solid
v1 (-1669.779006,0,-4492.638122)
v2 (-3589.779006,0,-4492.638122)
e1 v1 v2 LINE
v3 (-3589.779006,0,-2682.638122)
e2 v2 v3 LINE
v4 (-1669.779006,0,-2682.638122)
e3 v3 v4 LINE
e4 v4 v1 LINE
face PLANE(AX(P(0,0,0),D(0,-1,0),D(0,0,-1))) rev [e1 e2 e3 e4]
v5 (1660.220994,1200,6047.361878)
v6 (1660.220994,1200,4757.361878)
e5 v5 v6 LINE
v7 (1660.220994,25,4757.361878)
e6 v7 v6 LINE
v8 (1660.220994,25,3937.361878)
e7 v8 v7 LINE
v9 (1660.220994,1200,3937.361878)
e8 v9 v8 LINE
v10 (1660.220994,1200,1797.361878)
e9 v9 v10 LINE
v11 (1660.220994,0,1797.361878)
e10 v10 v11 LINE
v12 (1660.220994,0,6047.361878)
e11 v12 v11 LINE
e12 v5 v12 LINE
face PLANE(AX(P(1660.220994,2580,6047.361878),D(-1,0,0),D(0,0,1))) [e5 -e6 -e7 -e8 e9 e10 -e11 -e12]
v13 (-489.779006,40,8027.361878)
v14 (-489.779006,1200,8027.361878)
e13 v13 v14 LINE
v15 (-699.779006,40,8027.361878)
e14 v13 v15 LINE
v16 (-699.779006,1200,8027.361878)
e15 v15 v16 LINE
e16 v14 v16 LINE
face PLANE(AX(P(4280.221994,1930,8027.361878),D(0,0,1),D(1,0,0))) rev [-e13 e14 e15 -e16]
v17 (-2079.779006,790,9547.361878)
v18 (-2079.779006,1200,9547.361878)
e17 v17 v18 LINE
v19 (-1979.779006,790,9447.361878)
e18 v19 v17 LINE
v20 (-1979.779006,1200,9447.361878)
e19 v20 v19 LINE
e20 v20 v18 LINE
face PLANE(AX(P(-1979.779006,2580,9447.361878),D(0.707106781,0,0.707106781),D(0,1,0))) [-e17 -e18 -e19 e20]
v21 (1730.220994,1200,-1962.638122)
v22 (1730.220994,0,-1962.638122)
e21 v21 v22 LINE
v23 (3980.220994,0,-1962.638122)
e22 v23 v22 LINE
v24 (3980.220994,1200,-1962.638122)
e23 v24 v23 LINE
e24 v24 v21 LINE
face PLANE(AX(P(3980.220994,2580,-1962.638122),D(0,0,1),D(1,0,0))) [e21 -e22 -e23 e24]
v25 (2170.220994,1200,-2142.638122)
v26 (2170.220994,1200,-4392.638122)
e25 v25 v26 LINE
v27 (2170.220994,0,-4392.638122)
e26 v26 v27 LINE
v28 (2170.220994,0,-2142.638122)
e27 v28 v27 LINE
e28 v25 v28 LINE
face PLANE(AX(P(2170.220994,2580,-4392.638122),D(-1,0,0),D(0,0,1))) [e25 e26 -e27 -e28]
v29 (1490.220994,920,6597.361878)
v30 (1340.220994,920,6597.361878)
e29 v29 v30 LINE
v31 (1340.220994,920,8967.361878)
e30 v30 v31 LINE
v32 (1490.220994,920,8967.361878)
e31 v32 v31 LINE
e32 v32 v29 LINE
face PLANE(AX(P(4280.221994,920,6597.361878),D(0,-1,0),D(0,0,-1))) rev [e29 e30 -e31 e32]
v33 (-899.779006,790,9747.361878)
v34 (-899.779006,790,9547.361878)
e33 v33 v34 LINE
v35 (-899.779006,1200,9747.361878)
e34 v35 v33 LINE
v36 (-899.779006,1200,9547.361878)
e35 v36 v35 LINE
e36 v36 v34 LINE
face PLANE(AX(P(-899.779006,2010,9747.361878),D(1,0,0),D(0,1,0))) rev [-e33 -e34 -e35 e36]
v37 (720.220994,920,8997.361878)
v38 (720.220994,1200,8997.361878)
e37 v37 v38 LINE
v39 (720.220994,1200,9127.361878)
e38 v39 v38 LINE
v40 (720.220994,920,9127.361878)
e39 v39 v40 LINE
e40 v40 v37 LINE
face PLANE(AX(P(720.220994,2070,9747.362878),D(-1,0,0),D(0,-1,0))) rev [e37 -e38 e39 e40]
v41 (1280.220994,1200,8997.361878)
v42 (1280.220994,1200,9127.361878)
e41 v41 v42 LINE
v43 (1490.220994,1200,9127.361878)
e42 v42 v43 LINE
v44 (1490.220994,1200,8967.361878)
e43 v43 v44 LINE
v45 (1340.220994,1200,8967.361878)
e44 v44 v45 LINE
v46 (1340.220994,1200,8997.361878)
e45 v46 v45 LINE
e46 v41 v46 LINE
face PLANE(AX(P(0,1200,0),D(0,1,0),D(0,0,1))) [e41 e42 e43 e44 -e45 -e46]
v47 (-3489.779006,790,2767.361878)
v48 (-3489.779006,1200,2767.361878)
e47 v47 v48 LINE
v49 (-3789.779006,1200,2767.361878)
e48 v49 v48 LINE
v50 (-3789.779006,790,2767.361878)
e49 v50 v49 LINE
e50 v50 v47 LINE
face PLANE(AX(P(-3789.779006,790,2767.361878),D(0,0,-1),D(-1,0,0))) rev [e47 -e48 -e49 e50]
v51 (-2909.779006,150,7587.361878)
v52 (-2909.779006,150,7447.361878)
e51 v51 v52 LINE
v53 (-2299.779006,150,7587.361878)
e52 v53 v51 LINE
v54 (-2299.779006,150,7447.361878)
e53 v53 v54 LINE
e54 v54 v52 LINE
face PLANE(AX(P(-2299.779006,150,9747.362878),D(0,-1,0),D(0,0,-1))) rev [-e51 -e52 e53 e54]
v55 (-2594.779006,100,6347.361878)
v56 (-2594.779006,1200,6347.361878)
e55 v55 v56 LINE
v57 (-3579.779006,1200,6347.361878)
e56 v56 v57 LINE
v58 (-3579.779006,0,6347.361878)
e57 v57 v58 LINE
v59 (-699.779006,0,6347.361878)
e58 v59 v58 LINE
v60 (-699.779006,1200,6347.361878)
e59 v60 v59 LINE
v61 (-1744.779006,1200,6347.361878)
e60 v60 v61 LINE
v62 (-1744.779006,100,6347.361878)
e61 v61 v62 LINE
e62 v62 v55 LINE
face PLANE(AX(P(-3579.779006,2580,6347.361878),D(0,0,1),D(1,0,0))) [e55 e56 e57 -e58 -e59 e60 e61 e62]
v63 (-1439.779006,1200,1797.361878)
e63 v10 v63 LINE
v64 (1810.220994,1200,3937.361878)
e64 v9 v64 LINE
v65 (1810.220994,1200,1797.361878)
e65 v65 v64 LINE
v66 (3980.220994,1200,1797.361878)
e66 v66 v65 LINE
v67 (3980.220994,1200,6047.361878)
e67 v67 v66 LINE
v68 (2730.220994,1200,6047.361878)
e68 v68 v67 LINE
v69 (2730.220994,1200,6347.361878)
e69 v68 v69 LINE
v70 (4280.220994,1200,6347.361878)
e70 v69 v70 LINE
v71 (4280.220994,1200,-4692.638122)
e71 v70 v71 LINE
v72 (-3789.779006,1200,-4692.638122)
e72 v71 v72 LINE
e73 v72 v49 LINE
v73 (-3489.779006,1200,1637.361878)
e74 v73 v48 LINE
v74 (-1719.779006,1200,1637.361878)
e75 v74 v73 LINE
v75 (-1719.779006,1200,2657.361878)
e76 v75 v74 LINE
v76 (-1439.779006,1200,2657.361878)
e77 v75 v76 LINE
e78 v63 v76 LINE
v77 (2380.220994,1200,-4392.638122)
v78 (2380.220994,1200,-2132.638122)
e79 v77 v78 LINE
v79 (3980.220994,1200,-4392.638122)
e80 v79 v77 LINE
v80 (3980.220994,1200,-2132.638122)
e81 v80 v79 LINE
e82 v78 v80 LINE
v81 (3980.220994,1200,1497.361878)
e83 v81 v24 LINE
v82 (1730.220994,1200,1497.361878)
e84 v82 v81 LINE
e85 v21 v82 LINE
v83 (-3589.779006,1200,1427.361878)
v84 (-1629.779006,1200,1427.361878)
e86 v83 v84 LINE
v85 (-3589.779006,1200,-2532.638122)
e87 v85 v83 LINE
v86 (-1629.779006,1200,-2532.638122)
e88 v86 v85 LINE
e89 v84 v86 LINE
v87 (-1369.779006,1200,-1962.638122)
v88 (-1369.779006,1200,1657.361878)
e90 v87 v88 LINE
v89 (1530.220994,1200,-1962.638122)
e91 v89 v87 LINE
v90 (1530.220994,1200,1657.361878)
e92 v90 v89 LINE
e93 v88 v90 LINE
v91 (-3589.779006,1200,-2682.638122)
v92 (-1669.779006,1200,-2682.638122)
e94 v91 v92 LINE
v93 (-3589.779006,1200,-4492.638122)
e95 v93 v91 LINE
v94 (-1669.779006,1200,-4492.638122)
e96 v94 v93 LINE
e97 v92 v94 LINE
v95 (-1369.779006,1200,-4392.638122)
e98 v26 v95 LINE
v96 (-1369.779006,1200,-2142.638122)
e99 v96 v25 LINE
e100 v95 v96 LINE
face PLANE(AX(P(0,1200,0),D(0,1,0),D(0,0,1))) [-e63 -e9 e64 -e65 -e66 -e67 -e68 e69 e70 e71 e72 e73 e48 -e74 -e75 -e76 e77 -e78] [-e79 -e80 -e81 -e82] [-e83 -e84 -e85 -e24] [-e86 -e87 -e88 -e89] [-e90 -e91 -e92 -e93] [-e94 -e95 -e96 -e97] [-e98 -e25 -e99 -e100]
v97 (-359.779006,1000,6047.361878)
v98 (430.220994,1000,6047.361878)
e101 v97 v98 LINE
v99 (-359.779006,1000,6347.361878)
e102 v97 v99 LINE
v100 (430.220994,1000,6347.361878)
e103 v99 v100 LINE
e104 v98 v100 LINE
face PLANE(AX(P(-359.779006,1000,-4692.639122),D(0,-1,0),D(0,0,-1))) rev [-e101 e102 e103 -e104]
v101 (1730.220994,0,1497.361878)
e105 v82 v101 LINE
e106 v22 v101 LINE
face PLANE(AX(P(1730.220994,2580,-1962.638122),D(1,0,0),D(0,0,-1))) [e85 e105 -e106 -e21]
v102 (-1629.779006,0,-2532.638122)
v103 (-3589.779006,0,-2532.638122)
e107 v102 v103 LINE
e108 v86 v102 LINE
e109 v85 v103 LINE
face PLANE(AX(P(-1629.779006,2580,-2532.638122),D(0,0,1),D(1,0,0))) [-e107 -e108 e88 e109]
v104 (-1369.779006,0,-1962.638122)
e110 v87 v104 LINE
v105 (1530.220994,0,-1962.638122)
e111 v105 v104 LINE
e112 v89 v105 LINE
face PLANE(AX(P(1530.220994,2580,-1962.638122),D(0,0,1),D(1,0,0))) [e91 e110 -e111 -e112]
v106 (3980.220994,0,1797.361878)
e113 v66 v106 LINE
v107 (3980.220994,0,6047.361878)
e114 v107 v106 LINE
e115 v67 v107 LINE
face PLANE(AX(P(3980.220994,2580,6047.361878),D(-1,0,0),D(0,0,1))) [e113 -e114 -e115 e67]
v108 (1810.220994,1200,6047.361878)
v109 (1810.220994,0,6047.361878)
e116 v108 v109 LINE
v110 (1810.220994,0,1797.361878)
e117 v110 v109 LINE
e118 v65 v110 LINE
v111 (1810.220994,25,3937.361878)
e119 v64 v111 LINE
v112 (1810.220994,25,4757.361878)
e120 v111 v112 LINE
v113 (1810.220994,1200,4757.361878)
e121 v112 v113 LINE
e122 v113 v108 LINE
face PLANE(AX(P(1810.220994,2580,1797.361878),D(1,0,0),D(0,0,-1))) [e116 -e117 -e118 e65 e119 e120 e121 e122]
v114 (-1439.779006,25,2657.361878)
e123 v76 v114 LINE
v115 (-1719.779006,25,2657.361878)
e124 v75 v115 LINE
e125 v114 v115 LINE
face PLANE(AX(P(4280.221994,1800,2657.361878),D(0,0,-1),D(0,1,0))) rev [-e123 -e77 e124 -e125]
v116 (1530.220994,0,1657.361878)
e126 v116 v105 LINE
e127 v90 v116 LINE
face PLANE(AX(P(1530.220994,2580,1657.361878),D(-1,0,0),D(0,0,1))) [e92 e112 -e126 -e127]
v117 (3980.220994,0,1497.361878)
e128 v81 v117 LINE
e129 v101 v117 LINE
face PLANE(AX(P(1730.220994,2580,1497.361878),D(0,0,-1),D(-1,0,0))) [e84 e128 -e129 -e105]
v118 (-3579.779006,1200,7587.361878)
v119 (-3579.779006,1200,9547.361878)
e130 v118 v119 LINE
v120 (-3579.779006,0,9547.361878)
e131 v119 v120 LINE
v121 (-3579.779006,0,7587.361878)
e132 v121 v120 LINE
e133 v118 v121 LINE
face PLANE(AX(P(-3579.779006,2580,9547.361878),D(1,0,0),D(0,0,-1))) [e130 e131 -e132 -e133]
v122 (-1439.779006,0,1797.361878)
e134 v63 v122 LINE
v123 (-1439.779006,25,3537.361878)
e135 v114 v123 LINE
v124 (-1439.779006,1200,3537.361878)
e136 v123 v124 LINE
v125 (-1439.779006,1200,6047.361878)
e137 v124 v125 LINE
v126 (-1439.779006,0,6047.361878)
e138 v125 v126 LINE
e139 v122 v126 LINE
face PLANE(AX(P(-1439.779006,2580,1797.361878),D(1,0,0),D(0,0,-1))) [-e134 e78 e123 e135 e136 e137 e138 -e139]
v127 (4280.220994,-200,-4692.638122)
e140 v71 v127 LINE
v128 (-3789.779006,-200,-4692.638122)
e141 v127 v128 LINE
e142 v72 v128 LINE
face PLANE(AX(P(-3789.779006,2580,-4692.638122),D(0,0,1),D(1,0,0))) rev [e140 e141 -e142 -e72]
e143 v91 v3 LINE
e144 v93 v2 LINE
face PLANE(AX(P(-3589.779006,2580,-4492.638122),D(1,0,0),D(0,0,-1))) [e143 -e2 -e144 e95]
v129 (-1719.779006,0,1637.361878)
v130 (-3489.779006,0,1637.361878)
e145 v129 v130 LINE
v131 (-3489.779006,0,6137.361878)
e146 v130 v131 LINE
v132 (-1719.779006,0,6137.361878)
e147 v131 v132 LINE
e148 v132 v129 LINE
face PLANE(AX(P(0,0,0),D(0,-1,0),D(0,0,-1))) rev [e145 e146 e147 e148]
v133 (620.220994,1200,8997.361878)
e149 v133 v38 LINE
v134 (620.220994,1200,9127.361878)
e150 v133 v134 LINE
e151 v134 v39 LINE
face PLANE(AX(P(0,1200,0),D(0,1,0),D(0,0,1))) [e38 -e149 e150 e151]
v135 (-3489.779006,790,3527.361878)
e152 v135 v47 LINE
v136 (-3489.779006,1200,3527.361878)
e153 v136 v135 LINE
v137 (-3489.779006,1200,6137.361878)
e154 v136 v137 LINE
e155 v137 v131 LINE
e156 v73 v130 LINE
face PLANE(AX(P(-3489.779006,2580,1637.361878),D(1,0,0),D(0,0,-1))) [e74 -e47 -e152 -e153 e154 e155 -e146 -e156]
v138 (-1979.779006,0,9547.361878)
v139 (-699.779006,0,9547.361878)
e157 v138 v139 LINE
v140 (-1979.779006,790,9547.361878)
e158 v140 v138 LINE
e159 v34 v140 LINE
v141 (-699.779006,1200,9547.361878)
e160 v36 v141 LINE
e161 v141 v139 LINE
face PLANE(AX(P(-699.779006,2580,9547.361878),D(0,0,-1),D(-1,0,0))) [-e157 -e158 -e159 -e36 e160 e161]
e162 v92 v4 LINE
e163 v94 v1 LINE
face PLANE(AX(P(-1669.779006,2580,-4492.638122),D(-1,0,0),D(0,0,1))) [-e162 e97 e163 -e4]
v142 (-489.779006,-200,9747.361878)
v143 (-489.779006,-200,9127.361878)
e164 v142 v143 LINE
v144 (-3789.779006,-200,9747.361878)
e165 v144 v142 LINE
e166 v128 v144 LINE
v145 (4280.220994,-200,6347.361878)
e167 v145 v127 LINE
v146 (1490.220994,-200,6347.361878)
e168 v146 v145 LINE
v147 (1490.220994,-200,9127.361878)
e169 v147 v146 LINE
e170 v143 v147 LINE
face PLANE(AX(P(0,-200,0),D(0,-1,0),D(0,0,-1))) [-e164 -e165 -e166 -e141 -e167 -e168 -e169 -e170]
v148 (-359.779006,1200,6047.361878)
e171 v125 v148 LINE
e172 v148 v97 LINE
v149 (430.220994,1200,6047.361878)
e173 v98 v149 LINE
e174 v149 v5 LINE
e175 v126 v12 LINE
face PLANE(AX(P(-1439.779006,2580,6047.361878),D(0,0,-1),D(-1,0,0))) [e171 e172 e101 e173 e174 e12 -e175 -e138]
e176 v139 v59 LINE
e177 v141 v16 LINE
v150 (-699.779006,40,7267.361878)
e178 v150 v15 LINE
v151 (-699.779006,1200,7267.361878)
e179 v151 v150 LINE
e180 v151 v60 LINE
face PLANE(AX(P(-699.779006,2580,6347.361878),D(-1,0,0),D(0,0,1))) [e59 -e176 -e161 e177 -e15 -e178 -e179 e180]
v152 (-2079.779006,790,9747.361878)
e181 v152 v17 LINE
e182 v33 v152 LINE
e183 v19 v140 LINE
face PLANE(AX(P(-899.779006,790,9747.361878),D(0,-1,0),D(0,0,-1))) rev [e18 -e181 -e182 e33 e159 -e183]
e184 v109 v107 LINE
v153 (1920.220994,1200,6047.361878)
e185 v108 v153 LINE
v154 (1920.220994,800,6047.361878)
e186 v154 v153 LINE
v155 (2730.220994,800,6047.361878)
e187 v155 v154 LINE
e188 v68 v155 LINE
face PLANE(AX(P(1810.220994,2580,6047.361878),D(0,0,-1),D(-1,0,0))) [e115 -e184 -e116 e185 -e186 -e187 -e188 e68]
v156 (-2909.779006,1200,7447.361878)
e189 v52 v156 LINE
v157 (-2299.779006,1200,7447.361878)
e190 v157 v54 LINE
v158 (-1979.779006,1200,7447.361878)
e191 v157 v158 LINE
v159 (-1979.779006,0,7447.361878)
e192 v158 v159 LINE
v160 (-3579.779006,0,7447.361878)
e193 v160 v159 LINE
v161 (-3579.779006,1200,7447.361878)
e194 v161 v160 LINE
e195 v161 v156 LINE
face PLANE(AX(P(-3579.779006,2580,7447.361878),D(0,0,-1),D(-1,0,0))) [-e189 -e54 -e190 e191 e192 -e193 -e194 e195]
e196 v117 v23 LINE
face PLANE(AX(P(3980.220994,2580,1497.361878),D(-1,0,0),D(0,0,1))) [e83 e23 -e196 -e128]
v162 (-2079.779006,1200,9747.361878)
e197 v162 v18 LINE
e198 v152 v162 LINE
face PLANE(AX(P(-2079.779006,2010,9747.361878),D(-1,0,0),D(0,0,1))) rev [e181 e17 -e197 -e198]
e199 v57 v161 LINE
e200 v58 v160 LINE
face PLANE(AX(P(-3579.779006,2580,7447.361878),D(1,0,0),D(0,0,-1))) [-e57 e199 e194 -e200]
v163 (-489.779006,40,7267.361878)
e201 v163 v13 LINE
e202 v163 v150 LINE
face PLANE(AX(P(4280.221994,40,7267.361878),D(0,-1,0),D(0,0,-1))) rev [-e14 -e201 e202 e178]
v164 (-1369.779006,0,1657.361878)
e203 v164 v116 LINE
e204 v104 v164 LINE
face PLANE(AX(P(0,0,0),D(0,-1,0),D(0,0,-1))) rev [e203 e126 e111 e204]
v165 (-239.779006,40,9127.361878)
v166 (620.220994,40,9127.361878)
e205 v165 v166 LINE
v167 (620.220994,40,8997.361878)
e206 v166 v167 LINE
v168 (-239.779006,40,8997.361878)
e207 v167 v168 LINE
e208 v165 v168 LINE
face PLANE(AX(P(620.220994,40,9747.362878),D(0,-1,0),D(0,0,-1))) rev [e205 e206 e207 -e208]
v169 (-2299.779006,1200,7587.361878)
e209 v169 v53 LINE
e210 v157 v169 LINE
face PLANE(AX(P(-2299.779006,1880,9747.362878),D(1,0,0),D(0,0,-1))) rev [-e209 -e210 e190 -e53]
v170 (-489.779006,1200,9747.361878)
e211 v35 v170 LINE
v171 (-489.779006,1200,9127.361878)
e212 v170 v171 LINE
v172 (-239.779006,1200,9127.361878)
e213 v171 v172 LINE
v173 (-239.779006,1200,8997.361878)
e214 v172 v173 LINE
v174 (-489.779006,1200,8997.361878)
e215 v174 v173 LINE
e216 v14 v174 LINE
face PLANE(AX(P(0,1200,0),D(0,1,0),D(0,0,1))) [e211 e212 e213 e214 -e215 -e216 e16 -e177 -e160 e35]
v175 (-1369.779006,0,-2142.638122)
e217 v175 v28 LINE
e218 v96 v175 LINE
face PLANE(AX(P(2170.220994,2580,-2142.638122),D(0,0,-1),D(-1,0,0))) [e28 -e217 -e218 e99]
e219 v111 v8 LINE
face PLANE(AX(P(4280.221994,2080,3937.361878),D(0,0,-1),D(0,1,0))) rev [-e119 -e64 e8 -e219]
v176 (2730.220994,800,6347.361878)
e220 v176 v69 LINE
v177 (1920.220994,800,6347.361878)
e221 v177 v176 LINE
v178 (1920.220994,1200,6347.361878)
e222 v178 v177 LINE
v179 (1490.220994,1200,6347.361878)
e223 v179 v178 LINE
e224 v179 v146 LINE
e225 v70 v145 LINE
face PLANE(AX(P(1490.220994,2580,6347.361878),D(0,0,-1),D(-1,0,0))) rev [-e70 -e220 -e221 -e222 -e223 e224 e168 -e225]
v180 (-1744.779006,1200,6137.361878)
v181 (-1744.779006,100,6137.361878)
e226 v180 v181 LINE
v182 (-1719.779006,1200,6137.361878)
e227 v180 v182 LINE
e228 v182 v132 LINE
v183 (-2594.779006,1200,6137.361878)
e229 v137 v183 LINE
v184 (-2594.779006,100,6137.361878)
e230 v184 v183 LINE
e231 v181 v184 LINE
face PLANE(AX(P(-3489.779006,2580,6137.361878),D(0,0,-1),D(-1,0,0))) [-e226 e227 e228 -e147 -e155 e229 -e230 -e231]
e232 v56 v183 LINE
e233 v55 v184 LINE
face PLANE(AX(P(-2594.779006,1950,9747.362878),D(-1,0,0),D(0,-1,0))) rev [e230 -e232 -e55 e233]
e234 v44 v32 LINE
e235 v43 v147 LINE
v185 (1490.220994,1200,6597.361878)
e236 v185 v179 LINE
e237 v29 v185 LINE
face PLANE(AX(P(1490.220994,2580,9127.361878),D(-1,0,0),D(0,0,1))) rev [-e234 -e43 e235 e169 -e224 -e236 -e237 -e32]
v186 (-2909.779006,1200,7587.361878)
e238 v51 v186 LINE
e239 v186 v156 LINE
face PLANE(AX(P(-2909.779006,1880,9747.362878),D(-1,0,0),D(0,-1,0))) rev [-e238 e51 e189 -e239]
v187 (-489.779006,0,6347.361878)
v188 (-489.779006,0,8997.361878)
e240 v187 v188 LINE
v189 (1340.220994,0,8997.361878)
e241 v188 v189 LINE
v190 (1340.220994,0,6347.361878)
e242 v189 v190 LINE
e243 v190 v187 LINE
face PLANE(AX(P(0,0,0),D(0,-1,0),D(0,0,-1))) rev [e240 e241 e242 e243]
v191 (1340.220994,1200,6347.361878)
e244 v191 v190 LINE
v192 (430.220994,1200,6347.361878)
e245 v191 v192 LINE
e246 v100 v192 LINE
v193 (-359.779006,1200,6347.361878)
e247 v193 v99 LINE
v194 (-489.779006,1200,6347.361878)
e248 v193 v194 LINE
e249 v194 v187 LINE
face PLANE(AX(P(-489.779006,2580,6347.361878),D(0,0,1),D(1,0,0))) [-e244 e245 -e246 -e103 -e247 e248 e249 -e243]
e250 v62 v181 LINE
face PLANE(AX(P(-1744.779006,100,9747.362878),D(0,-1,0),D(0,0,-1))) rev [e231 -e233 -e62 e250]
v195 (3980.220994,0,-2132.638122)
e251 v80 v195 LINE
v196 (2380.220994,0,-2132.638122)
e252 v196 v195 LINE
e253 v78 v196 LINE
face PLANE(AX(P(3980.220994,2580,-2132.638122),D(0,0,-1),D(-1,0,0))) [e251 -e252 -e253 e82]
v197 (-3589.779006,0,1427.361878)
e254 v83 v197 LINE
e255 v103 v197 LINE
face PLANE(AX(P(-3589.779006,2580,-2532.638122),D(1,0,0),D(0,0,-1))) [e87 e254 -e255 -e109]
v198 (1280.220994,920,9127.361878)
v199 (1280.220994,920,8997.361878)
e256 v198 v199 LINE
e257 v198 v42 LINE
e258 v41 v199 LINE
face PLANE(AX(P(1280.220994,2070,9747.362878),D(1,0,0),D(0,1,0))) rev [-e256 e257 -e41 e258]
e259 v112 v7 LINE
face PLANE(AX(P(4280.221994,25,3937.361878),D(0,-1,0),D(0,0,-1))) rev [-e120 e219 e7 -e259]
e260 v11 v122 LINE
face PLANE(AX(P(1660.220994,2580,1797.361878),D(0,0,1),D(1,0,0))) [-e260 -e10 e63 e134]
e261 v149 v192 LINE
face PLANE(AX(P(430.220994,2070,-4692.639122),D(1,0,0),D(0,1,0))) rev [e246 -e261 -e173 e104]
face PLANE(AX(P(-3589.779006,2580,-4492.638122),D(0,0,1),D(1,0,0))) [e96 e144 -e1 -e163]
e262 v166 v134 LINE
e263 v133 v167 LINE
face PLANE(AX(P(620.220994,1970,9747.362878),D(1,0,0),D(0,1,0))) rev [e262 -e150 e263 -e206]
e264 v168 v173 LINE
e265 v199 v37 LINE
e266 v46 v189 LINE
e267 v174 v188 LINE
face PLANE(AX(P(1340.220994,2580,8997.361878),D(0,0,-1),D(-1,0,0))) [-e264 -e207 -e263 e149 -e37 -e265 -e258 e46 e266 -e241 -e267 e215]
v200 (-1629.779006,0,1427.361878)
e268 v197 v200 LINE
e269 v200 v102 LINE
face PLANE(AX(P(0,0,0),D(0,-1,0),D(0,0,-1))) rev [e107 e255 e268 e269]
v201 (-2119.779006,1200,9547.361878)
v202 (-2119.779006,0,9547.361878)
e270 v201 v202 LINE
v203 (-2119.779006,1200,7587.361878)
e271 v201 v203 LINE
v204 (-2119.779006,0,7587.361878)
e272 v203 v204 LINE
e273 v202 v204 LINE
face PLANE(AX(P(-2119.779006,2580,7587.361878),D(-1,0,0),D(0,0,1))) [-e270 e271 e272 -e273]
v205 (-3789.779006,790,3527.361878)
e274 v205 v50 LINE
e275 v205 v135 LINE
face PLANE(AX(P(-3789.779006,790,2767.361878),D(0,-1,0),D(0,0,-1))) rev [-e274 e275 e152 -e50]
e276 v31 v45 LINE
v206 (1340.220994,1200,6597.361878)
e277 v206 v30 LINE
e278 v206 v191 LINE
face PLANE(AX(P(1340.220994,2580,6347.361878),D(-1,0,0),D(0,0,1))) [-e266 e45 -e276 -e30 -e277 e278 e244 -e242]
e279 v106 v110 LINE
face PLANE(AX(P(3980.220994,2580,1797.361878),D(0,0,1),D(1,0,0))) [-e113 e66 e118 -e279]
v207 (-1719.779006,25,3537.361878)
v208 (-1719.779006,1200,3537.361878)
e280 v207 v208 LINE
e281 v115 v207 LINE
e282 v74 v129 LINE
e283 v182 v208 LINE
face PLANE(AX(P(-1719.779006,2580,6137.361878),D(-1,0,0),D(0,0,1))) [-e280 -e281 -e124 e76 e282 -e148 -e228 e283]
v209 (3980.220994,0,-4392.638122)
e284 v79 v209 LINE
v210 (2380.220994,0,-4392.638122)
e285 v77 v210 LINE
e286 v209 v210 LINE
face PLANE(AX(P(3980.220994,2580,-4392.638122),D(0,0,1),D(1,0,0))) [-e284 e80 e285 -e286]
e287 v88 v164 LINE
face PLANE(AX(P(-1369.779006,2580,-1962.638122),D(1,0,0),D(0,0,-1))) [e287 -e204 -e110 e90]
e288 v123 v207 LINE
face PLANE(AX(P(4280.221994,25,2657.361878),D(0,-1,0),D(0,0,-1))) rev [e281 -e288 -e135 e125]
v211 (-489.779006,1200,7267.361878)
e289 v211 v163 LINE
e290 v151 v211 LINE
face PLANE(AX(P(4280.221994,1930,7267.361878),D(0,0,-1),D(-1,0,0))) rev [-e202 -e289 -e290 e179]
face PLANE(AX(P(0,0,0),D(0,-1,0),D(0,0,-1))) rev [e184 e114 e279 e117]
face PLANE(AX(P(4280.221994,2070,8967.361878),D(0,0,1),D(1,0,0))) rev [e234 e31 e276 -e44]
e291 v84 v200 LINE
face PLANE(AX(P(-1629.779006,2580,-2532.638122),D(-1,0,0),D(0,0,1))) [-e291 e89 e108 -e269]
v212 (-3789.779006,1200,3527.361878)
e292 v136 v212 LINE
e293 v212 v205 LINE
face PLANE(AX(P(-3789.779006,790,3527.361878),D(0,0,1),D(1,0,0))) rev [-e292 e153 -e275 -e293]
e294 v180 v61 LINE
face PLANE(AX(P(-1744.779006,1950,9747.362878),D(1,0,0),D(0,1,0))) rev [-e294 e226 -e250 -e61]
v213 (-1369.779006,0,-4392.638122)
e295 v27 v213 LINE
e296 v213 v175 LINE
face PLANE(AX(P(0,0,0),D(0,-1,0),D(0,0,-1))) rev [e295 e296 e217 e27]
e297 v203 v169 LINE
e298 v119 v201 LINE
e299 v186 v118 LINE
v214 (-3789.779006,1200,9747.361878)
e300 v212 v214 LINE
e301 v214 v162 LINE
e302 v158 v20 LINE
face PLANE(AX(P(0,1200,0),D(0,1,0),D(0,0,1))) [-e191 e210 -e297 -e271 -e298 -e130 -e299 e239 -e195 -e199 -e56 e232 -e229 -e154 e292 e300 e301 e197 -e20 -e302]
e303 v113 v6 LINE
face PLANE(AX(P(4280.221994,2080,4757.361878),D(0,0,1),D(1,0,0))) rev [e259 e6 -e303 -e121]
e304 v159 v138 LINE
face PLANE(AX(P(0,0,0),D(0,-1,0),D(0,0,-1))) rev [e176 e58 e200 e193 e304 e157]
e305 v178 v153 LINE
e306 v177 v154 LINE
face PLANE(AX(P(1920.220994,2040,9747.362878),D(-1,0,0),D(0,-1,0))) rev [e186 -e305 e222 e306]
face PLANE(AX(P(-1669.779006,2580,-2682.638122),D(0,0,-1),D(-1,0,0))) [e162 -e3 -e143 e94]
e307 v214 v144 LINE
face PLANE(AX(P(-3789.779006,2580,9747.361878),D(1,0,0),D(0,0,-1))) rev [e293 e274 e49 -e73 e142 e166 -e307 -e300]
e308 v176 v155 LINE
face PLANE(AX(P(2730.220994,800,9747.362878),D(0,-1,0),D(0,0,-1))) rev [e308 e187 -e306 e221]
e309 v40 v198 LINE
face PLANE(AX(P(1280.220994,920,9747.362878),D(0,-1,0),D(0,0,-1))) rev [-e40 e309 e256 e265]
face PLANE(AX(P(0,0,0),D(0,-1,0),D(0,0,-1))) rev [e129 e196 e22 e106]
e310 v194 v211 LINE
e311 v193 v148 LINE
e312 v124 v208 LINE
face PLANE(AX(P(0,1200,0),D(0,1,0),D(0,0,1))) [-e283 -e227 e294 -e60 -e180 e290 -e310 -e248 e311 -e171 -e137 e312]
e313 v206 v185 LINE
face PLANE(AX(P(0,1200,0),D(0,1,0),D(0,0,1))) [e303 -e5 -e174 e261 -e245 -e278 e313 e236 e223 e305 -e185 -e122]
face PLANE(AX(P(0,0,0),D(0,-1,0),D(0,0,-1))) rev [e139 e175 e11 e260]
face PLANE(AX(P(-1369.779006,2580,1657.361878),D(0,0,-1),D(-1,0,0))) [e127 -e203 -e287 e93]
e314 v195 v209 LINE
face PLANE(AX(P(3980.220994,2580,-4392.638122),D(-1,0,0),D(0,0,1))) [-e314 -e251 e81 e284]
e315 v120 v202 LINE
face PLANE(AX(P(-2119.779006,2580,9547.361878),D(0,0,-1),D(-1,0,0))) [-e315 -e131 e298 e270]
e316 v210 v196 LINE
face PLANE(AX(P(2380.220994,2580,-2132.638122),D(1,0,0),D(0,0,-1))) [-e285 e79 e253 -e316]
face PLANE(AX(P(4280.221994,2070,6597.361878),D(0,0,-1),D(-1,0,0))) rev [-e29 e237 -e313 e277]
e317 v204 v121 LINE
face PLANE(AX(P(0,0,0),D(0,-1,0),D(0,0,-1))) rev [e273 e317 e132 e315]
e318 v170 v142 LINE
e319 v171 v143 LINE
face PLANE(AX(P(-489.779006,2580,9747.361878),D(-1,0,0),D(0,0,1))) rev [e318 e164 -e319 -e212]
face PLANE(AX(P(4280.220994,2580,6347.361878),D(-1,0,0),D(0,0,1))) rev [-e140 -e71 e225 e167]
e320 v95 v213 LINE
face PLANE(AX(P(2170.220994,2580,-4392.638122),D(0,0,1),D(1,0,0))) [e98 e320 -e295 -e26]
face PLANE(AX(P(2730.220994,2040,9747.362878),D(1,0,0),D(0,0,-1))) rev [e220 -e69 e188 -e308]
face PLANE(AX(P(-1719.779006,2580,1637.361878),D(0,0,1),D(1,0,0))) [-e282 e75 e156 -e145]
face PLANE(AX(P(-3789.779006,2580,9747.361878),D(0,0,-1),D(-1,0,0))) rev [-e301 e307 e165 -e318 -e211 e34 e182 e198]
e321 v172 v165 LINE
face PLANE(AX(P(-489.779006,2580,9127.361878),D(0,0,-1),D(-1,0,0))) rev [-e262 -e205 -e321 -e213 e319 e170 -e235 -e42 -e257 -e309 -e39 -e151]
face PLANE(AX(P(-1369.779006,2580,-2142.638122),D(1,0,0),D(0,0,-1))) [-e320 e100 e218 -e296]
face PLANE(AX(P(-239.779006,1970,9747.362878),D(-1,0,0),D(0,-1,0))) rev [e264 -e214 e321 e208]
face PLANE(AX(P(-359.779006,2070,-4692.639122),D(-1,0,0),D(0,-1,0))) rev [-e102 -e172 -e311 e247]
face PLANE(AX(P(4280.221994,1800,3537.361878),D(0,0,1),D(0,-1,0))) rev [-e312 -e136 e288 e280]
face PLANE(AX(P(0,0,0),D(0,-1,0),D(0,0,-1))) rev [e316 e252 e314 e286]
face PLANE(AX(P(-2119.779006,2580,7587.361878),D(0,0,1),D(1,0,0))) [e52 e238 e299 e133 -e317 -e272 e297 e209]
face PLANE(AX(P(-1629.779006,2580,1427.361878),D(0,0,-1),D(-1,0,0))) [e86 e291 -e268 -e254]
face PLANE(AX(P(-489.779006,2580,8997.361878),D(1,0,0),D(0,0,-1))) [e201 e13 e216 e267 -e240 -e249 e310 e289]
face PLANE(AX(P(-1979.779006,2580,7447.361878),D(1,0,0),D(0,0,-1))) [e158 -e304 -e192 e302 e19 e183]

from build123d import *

# Parameters (mm, degrees)
SKETCH_1_W             = 1920
SKETCH_1_H             = 1810
SKETCH_1_W_2           = 1960
SKETCH_1_H_2           = 3960
SKETCH_1_W_3           = 1600
SKETCH_1_H_3           = 2260
SKETCH_1_W_4           = 2170
SKETCH_1_H_4           = 4250
SKETCH_1_W_5           = 3540
SKETCH_1_H_5           = 2250
SKETCH_1_W_6           = 2250
SKETCH_1_H_6           = 3460
SKETCH_1_W_7           = 2900
SKETCH_1_H_7           = 3620
SKETCH_1_W_8           = 1460
SKETCH_1_H_8           = 1960
SKETCH_1_W_9           = 1830
SKETCH_1_H_9           = 2650
SKETCH_1_W_10          = 3100
SKETCH_1_W_11          = 1770
SKETCH_1_H_10          = 4500
EXTRUDE_1796_DEPTH     = 2580
EXTRUDE_2026_DEPTH     = 200
SKETCH_5_W             = 760
SKETCH_5_H             = 1290
CUT_EXTRUDE_2294_DEPTH = 12730.50759415
SKETCH_7_W             = 1180
SKETCH_7_H             = 1220
CUT_EXTRUDE_2534_DEPTH = 15092.53046452
CHAMFER_1_SIZE         = 100
CUT_EXTRUDE_2822_REACH = 12120.51
SKETCH_10_W            = 790
SKETCH_10_H            = 1070
CUT_EXTRUDE_3074_REACH = 14575.702
SKETCH_11_W            = 860
SKETCH_11_H            = 1930
CUT_EXTRUDE_3320_REACH = 13130.454
SKETCH_12_W            = 610
SKETCH_12_H            = 1730
CUT_EXTRUDE_3576_REACH = 11929.514
SKETCH_13_W            = 850
SKETCH_13_H            = 1850
CUT_EXTRUDE_3824_REACH = 11735.178
SKETCH_15_W            = 880
SKETCH_15_H            = 1775
CUT_EXTRUDE_4057_REACH = 11847.855
SKETCH_16_W            = 810
SKETCH_16_H            = 1240
CUT_EXTRUDE_4303_REACH = 11463.674
SKETCH_17_W            = 820
SKETCH_17_H            = 2055
CUT_EXTRUDE_4598_REACH = 14575.702
SKETCH_19_W            = 560
SKETCH_19_H            = 1150
CUT_EXTRUDE_4844_REACH = 11315.017
SKETCH_20_W            = 2370
SKETCH_20_H            = 1150
CUT_EXTRUDE_5188_REACH = 11247.793
SKETCH_22_W            = 760
SKETCH_22_H            = 1890
SKETCH_21_W            = 8095.85133769
SKETCH_21_H            = 14487.658310263
CUT_EXTRUDE_5242_DEPTH = 1380


with BuildPart() as part:
    # Эскиз1 → Extrude 1796 (new body)
    with BuildSketch(Plane(origin=(0, 0, 0), x_dir=(1, 0, 0), z_dir=(0, 1, 0))):
        Polygon((-3789.779005525, -9747.361878453), (-489.779005525, -9747.361878453), (-489.779005525, -9127.361878453), (1490.220994475, -9127.361878453), (1490.220994475, -6347.361878453), (4280.220994475, -6347.361878453), (4280.220994475, 4692.638121547), (-3789.779005525, 4692.638121547), align=None)
        with Locations((-2629.779005525, 3587.638121547)):
            Rectangle(SKETCH_1_W, SKETCH_1_H, mode=Mode.SUBTRACT)
        with Locations((-2609.779005525, 552.638121547)):
            Rectangle(SKETCH_1_W_2, SKETCH_1_H_2, mode=Mode.SUBTRACT)
        with Locations((3180.220994475, 3262.638121547)):
            Rectangle(SKETCH_1_W_3, SKETCH_1_H_3, mode=Mode.SUBTRACT)
        with Locations((2895.220994475, -3922.361878453)):
            Rectangle(SKETCH_1_W_4, SKETCH_1_H_4, mode=Mode.SUBTRACT)
        with Locations((400.220994475, 3267.638121547)):
            Rectangle(SKETCH_1_W_5, SKETCH_1_H_5, mode=Mode.SUBTRACT)
        with Locations((2855.220994475, 232.638121547)):
            Rectangle(SKETCH_1_W_6, SKETCH_1_H_6, mode=Mode.SUBTRACT)
        with Locations((80.220994475, 152.638121547)):
            Rectangle(SKETCH_1_W_7, SKETCH_1_H_7, mode=Mode.SUBTRACT)
        Polygon((-699.779005525, -6347.361878453), (-699.779005525, -9547.361878453), (-1979.779005525, -9547.361878453), (-1979.779005525, -7447.361878453), (-3579.779005525, -7447.361878453), (-3579.779005525, -6347.361878453), align=None, mode=Mode.SUBTRACT)
        with Locations((-2849.779005525, -8567.361878453)):
            Rectangle(SKETCH_1_W_8, SKETCH_1_H_8, mode=Mode.SUBTRACT)
        with Locations((425.220994475, -7672.361878453)):
            Rectangle(SKETCH_1_W_9, SKETCH_1_H_9, mode=Mode.SUBTRACT)
        with Locations((110.220994475, -3922.361878453)):
            Rectangle(SKETCH_1_W_10, SKETCH_1_H_4, mode=Mode.SUBTRACT)
        with Locations((-2604.779005525, -3887.361878453)):
            Rectangle(SKETCH_1_W_11, SKETCH_1_H_10, mode=Mode.SUBTRACT)
    extrude(amount=EXTRUDE_1796_DEPTH)

    # Эскиз4 → Extrude 2026 (add)
    with BuildSketch(Plane(origin=(0, 0, 0), x_dir=(1, 0, 0), z_dir=(0, 1, 0))):
        Polygon((-3789.779005525, 4692.638121547), (4280.220994475, 4692.638121547), (4280.220994475, -6347.361878453), (1490.220994475, -6347.361878453), (1490.220994475, -9127.361878453), (-489.779005525, -9127.361878453), (-489.779005525, -9747.361878453), (-3789.779005525, -9747.361878453), align=None)
    extrude(amount=-EXTRUDE_2026_DEPTH)

    # Эскиз5 → Cut-Extrude 2294 (cut, through all)
    with BuildSketch(Plane(origin=(-3489.779005525, 0, 0), x_dir=(0, 0, -1), z_dir=(1, 0, 0))):
        with Locations((-3147.361878453, 1435)):
            Rectangle(SKETCH_5_W, SKETCH_5_H)
    extrude(amount=-CUT_EXTRUDE_2294_DEPTH, mode=Mode.SUBTRACT)

    # Эскиз7 → Cut-Extrude 2534 (cut, through all)
    with BuildSketch(Plane(origin=(0, 0, 9547.361878453), x_dir=(-1, 0, 0), z_dir=(0, 0, -1))):
        with Locations((1489.779005525, 1400)):
            Rectangle(SKETCH_7_W, SKETCH_7_H)
    extrude(amount=-CUT_EXTRUDE_2534_DEPTH, mode=Mode.SUBTRACT)

    # Фаска1
    chamfer_1_edges = [part.edges().sort_by_distance(p)[0] for p in [
        (-1979.779005525, 1400, 9547.361878453),
    ]]
    chamfer(chamfer_1_edges, length=CHAMFER_1_SIZE - 0.0001)  # a hair under: the kernel refuses the full size

    # Эскиз10 → Cut-Extrude 2822 (cut, up to next)
    with BuildSketch(Plane.XY.offset(6347.361878453), mode=Mode.PRIVATE) as cut_extrude_2822_sk1:
        with Locations((35.220994475, 1535)):
            Rectangle(SKETCH_10_W, SKETCH_10_H)
    cut_extrude_2822_tool1 = extrude(cut_extrude_2822_sk1.sketch, amount=-CUT_EXTRUDE_2822_REACH, mode=Mode.PRIVATE) & part.part
    add(cut_extrude_2822_tool1.solids().sort_by_distance((35.220994, 1535, 6347.361878))[0], mode=Mode.SUBTRACT)

    # Эскиз11 → Cut-Extrude 3074 (cut, up to next)
    with BuildSketch(Plane(origin=(0, 0, 8997.361878453), x_dir=(-1, 0, 0), z_dir=(0, 0, -1)), mode=Mode.PRIVATE) as cut_extrude_3074_sk1:
        with Locations((-190.220994475, 1005)):
            Rectangle(SKETCH_11_W, SKETCH_11_H)
    cut_extrude_3074_tool1 = extrude(cut_extrude_3074_sk1.sketch, amount=-CUT_EXTRUDE_3074_REACH, mode=Mode.PRIVATE) & part.part
    add(cut_extrude_3074_tool1.solids().sort_by_distance((190.220994, 1005, 8997.361878))[0], mode=Mode.SUBTRACT)

    # Эскиз12 → Cut-Extrude 3320 (cut, up to next)
    with BuildSketch(Plane(origin=(0, 0, 7447.361878453), x_dir=(-1, 0, 0), z_dir=(0, 0, -1)), mode=Mode.PRIVATE) as cut_extrude_3320_sk1:
        with Locations((2604.779005525, 1015)):
            Rectangle(SKETCH_12_W, SKETCH_12_H)
    cut_extrude_3320_tool1 = extrude(cut_extrude_3320_sk1.sketch, amount=-CUT_EXTRUDE_3320_REACH, mode=Mode.PRIVATE) & part.part
    add(cut_extrude_3320_tool1.solids().sort_by_distance((-2604.779006, 1015, 7447.361878))[0], mode=Mode.SUBTRACT)

    # Эскиз13 → Cut-Extrude 3576 (cut, up to next)
    with BuildSketch(Plane(origin=(0, 0, 6137.361878453), x_dir=(-1, 0, 0), z_dir=(0, 0, -1)), mode=Mode.PRIVATE) as cut_extrude_3576_sk1:
        with Locations((2169.779005525, 1025)):
            Rectangle(SKETCH_13_W, SKETCH_13_H)
    cut_extrude_3576_tool1 = extrude(cut_extrude_3576_sk1.sketch, amount=-CUT_EXTRUDE_3576_REACH, mode=Mode.PRIVATE) & part.part
    add(cut_extrude_3576_tool1.solids().sort_by_distance((-2169.779006, 1025, 6137.361878))[0], mode=Mode.SUBTRACT)

    # Эскиз15 → Cut-Extrude 3824 (cut, up to next)
    with BuildSketch(Plane.ZY.offset(1719.779005525), mode=Mode.PRIVATE) as cut_extrude_3824_sk1:
        with Locations((3097.361878453, 912.5)):
            Rectangle(SKETCH_15_W, SKETCH_15_H)
    cut_extrude_3824_tool1 = extrude(cut_extrude_3824_sk1.sketch, amount=-CUT_EXTRUDE_3824_REACH, mode=Mode.PRIVATE) & part.part
    add(cut_extrude_3824_tool1.solids().sort_by_distance((-1719.779006, 912.5, 3097.361878))[0], mode=Mode.SUBTRACT)

    # Эскиз16 → Cut-Extrude 4057 (cut, up to next)
    with BuildSketch(Plane(origin=(0, 0, 6047.361878453), x_dir=(-1, 0, 0), z_dir=(0, 0, -1)), mode=Mode.PRIVATE) as cut_extrude_4057_sk1:
        with Locations((-2325.220994475, 1420)):
            Rectangle(SKETCH_16_W, SKETCH_16_H)
    cut_extrude_4057_tool1 = extrude(cut_extrude_4057_sk1.sketch, amount=-CUT_EXTRUDE_4057_REACH, mode=Mode.PRIVATE) & part.part
    add(cut_extrude_4057_tool1.solids().sort_by_distance((2325.220994, 1420, 6047.361878))[0], mode=Mode.SUBTRACT)

    # Эскиз17 → Cut-Extrude 4303 (cut, up to next)
    with BuildSketch(Plane.ZY.offset(-1660.220994475), mode=Mode.PRIVATE) as cut_extrude_4303_sk1:
        with Locations((4347.361878453, 1052.5)):
            Rectangle(SKETCH_17_W, SKETCH_17_H)
    cut_extrude_4303_tool1 = extrude(cut_extrude_4303_sk1.sketch, amount=-CUT_EXTRUDE_4303_REACH, mode=Mode.PRIVATE) & part.part
    add(cut_extrude_4303_tool1.solids().sort_by_distance((1660.220994, 1052.5, 4347.361878))[0], mode=Mode.SUBTRACT)

    # Эскиз19 → Cut-Extrude 4598 (cut, up to next)
    with BuildSketch(Plane(origin=(0, 0, 8997.361878453), x_dir=(-1, 0, 0), z_dir=(0, 0, -1)), mode=Mode.PRIVATE) as cut_extrude_4598_sk1:
        with Locations((-1000.220994475, 1495)):
            Rectangle(SKETCH_19_W, SKETCH_19_H)
    cut_extrude_4598_tool1 = extrude(cut_extrude_4598_sk1.sketch, amount=-CUT_EXTRUDE_4598_REACH, mode=Mode.PRIVATE) & part.part
    add(cut_extrude_4598_tool1.solids().sort_by_distance((1000.220994, 1495, 8997.361878))[0], mode=Mode.SUBTRACT)

    # Эскиз20 → Cut-Extrude 4844 (cut, up to next)
    with BuildSketch(Plane.ZY.offset(-1340.220994475), mode=Mode.PRIVATE) as cut_extrude_4844_sk1:
        with Locations((7782.361878453, 1495)):
            Rectangle(SKETCH_20_W, SKETCH_20_H)
    cut_extrude_4844_tool1 = extrude(cut_extrude_4844_sk1.sketch, amount=-CUT_EXTRUDE_4844_REACH, mode=Mode.PRIVATE) & part.part
    add(cut_extrude_4844_tool1.solids().sort_by_distance((1340.220994, 1495, 7782.361878))[0], mode=Mode.SUBTRACT)

    # Эскиз22 → Cut-Extrude 5188 (cut, up to next)
    with BuildSketch(Plane.ZY.offset(699.779005525), mode=Mode.PRIVATE) as cut_extrude_5188_sk1:
        with Locations((7647.361878453, 985)):
            Rectangle(SKETCH_22_W, SKETCH_22_H)
    cut_extrude_5188_tool1 = extrude(cut_extrude_5188_sk1.sketch, amount=-CUT_EXTRUDE_5188_REACH, mode=Mode.PRIVATE) & part.part
    add(cut_extrude_5188_tool1.solids().sort_by_distance((-699.779006, 985, 7647.361878))[0], mode=Mode.SUBTRACT)

    # Эскиз21 → Cut-Extrude 5242 (cut)
    with BuildSketch(Plane(origin=(0, 2580, 0), x_dir=(1, 0, 0), z_dir=(0, 1, 0))):
        with Locations((258.14666332, -2551.191033585)):
            Rectangle(SKETCH_21_W, SKETCH_21_H)
    extrude(amount=-CUT_EXTRUDE_5242_DEPTH, mode=Mode.SUBTRACT)


solid = part.part
